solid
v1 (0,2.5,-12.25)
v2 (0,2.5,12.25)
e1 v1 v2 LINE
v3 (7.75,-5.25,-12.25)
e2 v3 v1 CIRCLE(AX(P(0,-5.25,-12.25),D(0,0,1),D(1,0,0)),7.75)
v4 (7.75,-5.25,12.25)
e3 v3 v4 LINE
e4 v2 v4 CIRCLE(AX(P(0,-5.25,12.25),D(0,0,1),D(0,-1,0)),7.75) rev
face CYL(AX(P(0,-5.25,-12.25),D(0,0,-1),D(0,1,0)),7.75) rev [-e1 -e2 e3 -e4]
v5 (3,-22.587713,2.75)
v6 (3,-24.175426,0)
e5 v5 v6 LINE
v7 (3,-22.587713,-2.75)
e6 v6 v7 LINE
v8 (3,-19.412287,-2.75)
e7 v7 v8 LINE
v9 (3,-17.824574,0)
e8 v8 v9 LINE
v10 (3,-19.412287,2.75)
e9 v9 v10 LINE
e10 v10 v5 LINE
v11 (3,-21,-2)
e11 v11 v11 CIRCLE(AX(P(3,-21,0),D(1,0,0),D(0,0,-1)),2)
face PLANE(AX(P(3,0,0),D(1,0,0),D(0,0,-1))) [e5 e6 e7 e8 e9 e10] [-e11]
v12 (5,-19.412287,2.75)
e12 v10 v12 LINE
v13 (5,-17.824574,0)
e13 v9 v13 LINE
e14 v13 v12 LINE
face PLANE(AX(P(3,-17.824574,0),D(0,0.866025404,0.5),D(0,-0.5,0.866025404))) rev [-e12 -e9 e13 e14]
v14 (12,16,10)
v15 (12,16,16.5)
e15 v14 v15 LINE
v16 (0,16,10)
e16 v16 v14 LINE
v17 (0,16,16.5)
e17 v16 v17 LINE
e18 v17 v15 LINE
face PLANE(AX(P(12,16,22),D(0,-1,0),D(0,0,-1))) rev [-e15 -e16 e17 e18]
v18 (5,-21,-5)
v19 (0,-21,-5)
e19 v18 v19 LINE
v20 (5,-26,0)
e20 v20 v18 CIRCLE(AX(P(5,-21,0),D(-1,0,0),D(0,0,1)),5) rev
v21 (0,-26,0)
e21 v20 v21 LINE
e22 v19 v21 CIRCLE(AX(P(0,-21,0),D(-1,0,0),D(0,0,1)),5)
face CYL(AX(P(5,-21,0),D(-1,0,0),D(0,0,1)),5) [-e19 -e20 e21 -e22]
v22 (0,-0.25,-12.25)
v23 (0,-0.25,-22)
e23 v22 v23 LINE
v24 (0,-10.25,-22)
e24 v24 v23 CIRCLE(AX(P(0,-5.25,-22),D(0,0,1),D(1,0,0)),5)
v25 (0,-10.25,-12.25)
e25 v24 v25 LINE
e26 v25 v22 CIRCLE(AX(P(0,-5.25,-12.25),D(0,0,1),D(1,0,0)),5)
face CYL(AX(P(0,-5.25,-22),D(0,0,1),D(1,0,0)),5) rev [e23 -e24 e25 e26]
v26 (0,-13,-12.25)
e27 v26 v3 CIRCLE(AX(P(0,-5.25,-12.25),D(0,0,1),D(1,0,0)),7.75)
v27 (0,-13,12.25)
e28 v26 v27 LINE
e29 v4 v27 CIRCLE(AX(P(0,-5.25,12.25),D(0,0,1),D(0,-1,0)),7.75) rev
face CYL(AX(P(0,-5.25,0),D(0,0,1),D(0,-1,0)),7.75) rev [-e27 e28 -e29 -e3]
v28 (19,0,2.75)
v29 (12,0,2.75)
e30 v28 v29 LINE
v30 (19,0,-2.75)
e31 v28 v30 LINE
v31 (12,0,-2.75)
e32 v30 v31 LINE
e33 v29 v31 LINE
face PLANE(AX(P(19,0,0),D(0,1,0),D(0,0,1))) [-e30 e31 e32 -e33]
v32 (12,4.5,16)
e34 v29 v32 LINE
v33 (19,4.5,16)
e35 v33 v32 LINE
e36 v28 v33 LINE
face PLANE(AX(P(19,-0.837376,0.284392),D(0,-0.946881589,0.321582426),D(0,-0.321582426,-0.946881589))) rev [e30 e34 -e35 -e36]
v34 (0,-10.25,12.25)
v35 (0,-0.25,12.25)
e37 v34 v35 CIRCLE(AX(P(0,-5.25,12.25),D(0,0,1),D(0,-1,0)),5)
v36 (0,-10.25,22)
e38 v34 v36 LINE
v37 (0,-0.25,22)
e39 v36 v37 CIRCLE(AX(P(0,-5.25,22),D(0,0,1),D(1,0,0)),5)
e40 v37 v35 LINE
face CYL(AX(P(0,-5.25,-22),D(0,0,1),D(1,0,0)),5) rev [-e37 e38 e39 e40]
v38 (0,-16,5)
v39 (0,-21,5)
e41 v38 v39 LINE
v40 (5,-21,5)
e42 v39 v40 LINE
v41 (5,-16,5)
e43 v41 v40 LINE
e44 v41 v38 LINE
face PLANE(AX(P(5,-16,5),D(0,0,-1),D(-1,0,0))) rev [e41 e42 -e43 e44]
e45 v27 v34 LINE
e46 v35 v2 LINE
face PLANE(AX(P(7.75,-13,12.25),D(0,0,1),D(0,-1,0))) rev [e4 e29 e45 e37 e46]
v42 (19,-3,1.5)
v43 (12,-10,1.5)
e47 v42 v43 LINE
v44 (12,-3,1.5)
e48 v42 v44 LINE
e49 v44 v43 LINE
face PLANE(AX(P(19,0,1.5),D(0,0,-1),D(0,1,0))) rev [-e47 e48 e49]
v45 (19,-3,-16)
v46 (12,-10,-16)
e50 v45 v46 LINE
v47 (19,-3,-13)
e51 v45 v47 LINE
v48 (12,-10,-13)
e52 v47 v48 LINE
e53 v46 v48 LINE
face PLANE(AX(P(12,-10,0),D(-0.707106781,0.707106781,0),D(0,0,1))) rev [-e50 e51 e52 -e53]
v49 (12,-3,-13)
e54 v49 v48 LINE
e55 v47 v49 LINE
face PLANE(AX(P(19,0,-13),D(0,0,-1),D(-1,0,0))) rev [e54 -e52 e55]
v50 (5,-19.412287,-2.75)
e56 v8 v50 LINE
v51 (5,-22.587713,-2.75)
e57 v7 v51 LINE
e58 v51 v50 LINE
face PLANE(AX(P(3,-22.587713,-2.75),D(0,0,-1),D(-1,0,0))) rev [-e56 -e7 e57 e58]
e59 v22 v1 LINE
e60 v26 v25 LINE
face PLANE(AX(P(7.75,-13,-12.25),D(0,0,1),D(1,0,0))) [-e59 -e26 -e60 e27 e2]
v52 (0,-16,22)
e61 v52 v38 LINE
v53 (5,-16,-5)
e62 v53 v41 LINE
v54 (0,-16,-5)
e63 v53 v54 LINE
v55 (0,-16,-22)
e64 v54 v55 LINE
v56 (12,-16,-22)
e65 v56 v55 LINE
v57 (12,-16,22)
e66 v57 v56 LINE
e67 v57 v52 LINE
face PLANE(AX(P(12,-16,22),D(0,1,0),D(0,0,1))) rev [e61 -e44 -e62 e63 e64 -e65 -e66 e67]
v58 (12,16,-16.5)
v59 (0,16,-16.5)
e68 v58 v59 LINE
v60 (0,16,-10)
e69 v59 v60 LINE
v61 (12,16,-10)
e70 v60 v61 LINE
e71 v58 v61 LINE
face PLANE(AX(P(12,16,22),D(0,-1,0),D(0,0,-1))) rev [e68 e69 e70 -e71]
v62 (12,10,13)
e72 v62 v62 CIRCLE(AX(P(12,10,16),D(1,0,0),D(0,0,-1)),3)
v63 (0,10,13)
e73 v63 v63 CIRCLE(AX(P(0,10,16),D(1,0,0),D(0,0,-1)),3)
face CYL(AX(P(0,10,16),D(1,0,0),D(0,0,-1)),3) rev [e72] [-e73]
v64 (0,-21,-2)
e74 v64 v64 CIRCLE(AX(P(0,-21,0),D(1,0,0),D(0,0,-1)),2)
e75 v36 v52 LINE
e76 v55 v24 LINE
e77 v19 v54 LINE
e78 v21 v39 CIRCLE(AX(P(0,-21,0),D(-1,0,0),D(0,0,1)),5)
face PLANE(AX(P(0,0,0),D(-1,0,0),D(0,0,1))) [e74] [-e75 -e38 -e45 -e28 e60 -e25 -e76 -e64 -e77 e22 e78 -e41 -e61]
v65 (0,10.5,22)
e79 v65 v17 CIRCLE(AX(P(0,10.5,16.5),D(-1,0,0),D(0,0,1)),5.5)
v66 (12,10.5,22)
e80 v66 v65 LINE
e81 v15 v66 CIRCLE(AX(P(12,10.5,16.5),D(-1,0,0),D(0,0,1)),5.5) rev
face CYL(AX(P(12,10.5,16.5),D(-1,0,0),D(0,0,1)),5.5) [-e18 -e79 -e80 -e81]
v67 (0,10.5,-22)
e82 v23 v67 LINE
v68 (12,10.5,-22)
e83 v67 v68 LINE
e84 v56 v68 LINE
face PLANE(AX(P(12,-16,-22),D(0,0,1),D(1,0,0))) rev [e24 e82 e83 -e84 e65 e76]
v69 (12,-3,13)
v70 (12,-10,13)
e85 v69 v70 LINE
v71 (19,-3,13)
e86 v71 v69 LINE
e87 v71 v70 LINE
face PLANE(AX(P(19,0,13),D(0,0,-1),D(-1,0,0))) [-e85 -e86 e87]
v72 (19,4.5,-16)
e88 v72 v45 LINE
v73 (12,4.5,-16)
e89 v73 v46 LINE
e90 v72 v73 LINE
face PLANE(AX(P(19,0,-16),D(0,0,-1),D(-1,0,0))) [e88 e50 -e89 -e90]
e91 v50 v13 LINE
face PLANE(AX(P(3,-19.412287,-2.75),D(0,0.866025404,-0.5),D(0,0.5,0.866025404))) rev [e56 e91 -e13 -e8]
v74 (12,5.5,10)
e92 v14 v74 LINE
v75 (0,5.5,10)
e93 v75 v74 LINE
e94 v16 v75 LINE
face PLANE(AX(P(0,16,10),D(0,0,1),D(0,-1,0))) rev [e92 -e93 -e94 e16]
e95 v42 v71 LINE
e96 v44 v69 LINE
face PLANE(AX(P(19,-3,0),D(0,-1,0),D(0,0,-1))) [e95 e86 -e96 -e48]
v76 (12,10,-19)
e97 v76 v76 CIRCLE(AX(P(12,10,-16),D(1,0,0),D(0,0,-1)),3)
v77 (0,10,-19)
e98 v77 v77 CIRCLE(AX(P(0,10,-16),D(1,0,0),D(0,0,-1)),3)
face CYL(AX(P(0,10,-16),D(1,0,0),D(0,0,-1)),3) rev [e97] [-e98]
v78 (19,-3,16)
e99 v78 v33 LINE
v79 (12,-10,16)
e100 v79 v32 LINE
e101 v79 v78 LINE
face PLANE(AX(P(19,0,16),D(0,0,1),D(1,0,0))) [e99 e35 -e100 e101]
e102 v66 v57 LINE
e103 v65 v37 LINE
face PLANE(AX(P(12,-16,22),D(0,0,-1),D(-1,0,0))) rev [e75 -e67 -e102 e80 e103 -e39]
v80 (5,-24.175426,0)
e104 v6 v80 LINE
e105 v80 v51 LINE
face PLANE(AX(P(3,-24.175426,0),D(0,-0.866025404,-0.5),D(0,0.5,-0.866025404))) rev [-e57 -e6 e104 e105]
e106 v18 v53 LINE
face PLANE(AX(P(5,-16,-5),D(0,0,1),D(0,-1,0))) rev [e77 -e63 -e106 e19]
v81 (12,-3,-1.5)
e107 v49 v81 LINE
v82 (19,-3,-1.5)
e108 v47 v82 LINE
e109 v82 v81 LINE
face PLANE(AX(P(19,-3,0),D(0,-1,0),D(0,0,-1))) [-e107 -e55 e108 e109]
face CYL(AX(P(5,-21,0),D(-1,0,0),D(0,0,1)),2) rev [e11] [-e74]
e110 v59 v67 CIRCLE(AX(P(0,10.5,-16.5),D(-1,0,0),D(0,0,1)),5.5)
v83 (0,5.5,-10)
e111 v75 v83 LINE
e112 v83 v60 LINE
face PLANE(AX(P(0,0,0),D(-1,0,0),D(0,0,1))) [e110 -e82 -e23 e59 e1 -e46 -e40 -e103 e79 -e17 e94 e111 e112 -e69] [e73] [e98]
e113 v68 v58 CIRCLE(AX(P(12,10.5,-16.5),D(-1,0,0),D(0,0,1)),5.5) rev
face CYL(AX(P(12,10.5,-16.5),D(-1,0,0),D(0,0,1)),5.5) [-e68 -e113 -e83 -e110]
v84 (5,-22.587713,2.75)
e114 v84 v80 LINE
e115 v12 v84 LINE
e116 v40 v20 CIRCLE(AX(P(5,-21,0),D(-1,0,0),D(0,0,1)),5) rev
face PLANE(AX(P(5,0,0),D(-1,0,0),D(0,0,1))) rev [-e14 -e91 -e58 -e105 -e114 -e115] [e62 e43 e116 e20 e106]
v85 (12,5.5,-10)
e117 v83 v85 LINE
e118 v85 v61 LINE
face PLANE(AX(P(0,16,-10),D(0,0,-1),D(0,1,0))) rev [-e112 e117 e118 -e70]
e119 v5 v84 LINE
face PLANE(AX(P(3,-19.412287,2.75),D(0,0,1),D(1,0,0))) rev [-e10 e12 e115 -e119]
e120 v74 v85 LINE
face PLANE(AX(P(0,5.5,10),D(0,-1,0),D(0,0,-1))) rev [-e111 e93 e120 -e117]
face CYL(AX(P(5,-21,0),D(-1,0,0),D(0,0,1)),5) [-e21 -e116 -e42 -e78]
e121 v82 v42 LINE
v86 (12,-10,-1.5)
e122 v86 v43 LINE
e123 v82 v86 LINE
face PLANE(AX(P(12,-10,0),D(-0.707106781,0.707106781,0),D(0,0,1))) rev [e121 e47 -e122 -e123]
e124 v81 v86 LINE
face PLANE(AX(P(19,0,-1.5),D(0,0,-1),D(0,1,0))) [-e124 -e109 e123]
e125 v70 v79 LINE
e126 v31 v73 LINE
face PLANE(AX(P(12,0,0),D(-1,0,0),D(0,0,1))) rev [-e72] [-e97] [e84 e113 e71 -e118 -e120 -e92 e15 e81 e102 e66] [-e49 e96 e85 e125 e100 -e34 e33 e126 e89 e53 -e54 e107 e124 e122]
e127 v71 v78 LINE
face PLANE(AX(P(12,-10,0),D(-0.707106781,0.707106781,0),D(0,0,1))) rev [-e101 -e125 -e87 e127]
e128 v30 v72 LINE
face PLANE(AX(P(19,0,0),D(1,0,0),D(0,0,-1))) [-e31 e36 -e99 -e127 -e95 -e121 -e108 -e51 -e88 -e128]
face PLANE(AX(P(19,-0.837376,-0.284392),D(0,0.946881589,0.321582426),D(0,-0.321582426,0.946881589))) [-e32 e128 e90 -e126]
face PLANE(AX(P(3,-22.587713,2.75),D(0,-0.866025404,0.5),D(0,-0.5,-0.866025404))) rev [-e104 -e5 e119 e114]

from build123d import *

# Parameters (mm, degrees)
SKETCH1_W               = 44
SKETCH1_H               = 32
BOSS_EXTRUDE1_DEPTH     = 12
SKETCH2_W               = 24.5
SKETCH2_H               = 15.5
CUT_EXTRUDE1_DEPTH      = 7.75
FILLET1_R               = 7.75
CUT_EXTRUDE2_DEPTH      = 40.661851949
CUT_EXTRUDE2_DEPTH_BACK = 40.661851949
SKETCH4_R               = 3
SKETCH4_W               = 20
SKETCH4_H               = 10.5
CUT_EXTRUDE3_DEPTH      = 30.732137495
SKETCH5_W               = 5.5
SKETCH5_H               = 3
BOSS_EXTRUDE4_DEPTH     = 7
CHAMFER1_SIZE           = 7
SKETCH6_W               = 11.5
SKETCH6_H               = 7
CUT_EXTRUDE5_DEPTH      = 30.732137495
FILLET4_R               = 5.5
SKETCH7_W               = 10
SKETCH7_H               = 10
SKETCH7_R               = 2
BOSS_EXTRUDE5_DEPTH     = 5
CUT_EXTRUDE6_START      = -2
SKETCH8_R               = 2
CUT_EXTRUDE6_DEPTH      = 2
FILLET5_R               = 5


with BuildPart() as part:
    # Sketch1 → Boss-Extrude1 (new body)
    with BuildSketch(Plane(origin=(0, 0, 0), x_dir=(0, 0, -1), z_dir=(1, 0, 0))):
        Rectangle(SKETCH1_W, SKETCH1_H)
    extrude(amount=BOSS_EXTRUDE1_DEPTH)

    # Sketch2 → Cut-Extrude1 (cut)
    with BuildSketch(Plane(origin=(0, 0, 0), x_dir=(0, 0, -1), z_dir=(1, 0, 0))):
        with Locations((0, -5.25)):
            Rectangle(SKETCH2_W, SKETCH2_H)
    extrude(amount=CUT_EXTRUDE1_DEPTH, mode=Mode.SUBTRACT)

    # Fillet1
    fillet1_edges = [part.edges().sort_by_distance(p)[0] for p in [
        (7.75, 2.5, 0),
        (7.75, -13, 0),
    ]]
    fillet(fillet1_edges, radius=FILLET1_R - 0.0001)  # a hair under: the kernel refuses the full size

    # Sketch3 → Cut-Extrude2 (cut, two sides: drawn at the far end of the back side and taken through both)
    with BuildSketch(Plane.XY.offset(-12.25).offset(-CUT_EXTRUDE2_DEPTH_BACK)):
        with BuildLine():
            ThreePointArc((0, -10.25), (3.535533906, -8.785533906), (5, -5.25))
            ThreePointArc((5, -5.25), (3.535533906, -1.714466094), (0, -0.25))
            Line((0, -0.25), (0, -10.25))
        make_face()
        with BuildLine():
            Line((0, -10.25), (0, -0.25))
            ThreePointArc((0, -0.25), (-5, -5.25), (0, -10.25))
        make_face()
    extrude(amount=CUT_EXTRUDE2_DEPTH + CUT_EXTRUDE2_DEPTH_BACK, mode=Mode.SUBTRACT)

    # Sketch4 → Cut-Extrude3 (cut, through all)
    with BuildSketch(Plane(origin=(12, 0, 0), x_dir=(0, 0, -1), z_dir=(1, 0, 0))):
        with Locations((-16, 10)):
            Circle(SKETCH4_R)
        with Locations((16, 10)):
            Circle(SKETCH4_R)
        with Locations((0, 10.75)):
            Rectangle(SKETCH4_W, SKETCH4_H)
    extrude(amount=-CUT_EXTRUDE3_DEPTH, mode=Mode.SUBTRACT)

    # Sketch5 → Boss-Extrude4 (add)
    with BuildSketch(Plane(origin=(12, 0, 0), x_dir=(0, 0, -1), z_dir=(1, 0, 0))):
        Polygon((-16, -3), (-16, 4.5), (-2.75, -3), align=None)
        Polygon((-2.75, -3), (-16, 4.5), (-2.75, 0), align=None)
        with Locations((0, -1.5)):
            Rectangle(SKETCH5_W, SKETCH5_H)
        Polygon((2.75, -3), (2.75, 0), (16, 4.5), align=None)
        Polygon((16, -3), (2.75, -3), (16, 4.5), align=None)
    extrude(amount=BOSS_EXTRUDE4_DEPTH)

    # Chamfer1
    chamfer1_edges = [part.edges().sort_by_distance(p)[0] for p in [
        (12, -3, 0),
    ]]
    chamfer(chamfer1_edges, length=CHAMFER1_SIZE - 0.0001)  # a hair under: the kernel refuses the full size

    # Sketch6 → Cut-Extrude5 (cut, through all)
    with BuildSketch(Plane(origin=(12, 0, 0), x_dir=(0, 0, -1), z_dir=(1, 0, 0))):
        with Locations((-7.25, -6.5)):
            Rectangle(SKETCH6_W, SKETCH6_H)
        with Locations((7.25, -6.5)):
            Rectangle(SKETCH6_W, SKETCH6_H)
    extrude(amount=CUT_EXTRUDE5_DEPTH, mode=Mode.SUBTRACT)

    # Fillet4
    fillet4_edges = [part.edges().sort_by_distance(p)[0] for p in [
        (6, 16, 22),
        (6, 16, -22),
    ]]
    fillet(fillet4_edges, radius=FILLET4_R)

    # Sketch7 → Boss-Extrude5 (add)
    with BuildSketch(Plane(origin=(0, 0, 0), x_dir=(0, 0, -1), z_dir=(1, 0, 0))):
        with Locations((0, -21)):
            Rectangle(SKETCH7_W, SKETCH7_H)
        with Locations((0, -21)):
            Circle(SKETCH7_R, mode=Mode.SUBTRACT)
    extrude(amount=BOSS_EXTRUDE5_DEPTH)

    # Sketch8 → Cut-Extrude6 (cut)
    with BuildSketch(Plane(origin=(5, 0, 0), x_dir=(0, 0, -1), z_dir=(1, 0, 0)).offset(CUT_EXTRUDE6_START)):
        Polygon((0, -24.175426481), (2.75, -22.58771324), (2.75, -19.41228676), (0, -17.824573519), (-2.75, -19.41228676), (-2.75, -22.58771324), align=None)
        with Locations((0, -21)):
            Circle(SKETCH8_R, mode=Mode.SUBTRACT)
    extrude(amount=CUT_EXTRUDE6_DEPTH, mode=Mode.SUBTRACT)

    # Fillet5
    fillet5_edges = [part.edges().sort_by_distance(p)[0] for p in [
        (2.5, -26, -5),
        (2.5, -26, 5),
    ]]
    fillet(fillet5_edges, radius=FILLET5_R - 0.0001)  # a hair under: the kernel refuses the full size


solid = part.part
